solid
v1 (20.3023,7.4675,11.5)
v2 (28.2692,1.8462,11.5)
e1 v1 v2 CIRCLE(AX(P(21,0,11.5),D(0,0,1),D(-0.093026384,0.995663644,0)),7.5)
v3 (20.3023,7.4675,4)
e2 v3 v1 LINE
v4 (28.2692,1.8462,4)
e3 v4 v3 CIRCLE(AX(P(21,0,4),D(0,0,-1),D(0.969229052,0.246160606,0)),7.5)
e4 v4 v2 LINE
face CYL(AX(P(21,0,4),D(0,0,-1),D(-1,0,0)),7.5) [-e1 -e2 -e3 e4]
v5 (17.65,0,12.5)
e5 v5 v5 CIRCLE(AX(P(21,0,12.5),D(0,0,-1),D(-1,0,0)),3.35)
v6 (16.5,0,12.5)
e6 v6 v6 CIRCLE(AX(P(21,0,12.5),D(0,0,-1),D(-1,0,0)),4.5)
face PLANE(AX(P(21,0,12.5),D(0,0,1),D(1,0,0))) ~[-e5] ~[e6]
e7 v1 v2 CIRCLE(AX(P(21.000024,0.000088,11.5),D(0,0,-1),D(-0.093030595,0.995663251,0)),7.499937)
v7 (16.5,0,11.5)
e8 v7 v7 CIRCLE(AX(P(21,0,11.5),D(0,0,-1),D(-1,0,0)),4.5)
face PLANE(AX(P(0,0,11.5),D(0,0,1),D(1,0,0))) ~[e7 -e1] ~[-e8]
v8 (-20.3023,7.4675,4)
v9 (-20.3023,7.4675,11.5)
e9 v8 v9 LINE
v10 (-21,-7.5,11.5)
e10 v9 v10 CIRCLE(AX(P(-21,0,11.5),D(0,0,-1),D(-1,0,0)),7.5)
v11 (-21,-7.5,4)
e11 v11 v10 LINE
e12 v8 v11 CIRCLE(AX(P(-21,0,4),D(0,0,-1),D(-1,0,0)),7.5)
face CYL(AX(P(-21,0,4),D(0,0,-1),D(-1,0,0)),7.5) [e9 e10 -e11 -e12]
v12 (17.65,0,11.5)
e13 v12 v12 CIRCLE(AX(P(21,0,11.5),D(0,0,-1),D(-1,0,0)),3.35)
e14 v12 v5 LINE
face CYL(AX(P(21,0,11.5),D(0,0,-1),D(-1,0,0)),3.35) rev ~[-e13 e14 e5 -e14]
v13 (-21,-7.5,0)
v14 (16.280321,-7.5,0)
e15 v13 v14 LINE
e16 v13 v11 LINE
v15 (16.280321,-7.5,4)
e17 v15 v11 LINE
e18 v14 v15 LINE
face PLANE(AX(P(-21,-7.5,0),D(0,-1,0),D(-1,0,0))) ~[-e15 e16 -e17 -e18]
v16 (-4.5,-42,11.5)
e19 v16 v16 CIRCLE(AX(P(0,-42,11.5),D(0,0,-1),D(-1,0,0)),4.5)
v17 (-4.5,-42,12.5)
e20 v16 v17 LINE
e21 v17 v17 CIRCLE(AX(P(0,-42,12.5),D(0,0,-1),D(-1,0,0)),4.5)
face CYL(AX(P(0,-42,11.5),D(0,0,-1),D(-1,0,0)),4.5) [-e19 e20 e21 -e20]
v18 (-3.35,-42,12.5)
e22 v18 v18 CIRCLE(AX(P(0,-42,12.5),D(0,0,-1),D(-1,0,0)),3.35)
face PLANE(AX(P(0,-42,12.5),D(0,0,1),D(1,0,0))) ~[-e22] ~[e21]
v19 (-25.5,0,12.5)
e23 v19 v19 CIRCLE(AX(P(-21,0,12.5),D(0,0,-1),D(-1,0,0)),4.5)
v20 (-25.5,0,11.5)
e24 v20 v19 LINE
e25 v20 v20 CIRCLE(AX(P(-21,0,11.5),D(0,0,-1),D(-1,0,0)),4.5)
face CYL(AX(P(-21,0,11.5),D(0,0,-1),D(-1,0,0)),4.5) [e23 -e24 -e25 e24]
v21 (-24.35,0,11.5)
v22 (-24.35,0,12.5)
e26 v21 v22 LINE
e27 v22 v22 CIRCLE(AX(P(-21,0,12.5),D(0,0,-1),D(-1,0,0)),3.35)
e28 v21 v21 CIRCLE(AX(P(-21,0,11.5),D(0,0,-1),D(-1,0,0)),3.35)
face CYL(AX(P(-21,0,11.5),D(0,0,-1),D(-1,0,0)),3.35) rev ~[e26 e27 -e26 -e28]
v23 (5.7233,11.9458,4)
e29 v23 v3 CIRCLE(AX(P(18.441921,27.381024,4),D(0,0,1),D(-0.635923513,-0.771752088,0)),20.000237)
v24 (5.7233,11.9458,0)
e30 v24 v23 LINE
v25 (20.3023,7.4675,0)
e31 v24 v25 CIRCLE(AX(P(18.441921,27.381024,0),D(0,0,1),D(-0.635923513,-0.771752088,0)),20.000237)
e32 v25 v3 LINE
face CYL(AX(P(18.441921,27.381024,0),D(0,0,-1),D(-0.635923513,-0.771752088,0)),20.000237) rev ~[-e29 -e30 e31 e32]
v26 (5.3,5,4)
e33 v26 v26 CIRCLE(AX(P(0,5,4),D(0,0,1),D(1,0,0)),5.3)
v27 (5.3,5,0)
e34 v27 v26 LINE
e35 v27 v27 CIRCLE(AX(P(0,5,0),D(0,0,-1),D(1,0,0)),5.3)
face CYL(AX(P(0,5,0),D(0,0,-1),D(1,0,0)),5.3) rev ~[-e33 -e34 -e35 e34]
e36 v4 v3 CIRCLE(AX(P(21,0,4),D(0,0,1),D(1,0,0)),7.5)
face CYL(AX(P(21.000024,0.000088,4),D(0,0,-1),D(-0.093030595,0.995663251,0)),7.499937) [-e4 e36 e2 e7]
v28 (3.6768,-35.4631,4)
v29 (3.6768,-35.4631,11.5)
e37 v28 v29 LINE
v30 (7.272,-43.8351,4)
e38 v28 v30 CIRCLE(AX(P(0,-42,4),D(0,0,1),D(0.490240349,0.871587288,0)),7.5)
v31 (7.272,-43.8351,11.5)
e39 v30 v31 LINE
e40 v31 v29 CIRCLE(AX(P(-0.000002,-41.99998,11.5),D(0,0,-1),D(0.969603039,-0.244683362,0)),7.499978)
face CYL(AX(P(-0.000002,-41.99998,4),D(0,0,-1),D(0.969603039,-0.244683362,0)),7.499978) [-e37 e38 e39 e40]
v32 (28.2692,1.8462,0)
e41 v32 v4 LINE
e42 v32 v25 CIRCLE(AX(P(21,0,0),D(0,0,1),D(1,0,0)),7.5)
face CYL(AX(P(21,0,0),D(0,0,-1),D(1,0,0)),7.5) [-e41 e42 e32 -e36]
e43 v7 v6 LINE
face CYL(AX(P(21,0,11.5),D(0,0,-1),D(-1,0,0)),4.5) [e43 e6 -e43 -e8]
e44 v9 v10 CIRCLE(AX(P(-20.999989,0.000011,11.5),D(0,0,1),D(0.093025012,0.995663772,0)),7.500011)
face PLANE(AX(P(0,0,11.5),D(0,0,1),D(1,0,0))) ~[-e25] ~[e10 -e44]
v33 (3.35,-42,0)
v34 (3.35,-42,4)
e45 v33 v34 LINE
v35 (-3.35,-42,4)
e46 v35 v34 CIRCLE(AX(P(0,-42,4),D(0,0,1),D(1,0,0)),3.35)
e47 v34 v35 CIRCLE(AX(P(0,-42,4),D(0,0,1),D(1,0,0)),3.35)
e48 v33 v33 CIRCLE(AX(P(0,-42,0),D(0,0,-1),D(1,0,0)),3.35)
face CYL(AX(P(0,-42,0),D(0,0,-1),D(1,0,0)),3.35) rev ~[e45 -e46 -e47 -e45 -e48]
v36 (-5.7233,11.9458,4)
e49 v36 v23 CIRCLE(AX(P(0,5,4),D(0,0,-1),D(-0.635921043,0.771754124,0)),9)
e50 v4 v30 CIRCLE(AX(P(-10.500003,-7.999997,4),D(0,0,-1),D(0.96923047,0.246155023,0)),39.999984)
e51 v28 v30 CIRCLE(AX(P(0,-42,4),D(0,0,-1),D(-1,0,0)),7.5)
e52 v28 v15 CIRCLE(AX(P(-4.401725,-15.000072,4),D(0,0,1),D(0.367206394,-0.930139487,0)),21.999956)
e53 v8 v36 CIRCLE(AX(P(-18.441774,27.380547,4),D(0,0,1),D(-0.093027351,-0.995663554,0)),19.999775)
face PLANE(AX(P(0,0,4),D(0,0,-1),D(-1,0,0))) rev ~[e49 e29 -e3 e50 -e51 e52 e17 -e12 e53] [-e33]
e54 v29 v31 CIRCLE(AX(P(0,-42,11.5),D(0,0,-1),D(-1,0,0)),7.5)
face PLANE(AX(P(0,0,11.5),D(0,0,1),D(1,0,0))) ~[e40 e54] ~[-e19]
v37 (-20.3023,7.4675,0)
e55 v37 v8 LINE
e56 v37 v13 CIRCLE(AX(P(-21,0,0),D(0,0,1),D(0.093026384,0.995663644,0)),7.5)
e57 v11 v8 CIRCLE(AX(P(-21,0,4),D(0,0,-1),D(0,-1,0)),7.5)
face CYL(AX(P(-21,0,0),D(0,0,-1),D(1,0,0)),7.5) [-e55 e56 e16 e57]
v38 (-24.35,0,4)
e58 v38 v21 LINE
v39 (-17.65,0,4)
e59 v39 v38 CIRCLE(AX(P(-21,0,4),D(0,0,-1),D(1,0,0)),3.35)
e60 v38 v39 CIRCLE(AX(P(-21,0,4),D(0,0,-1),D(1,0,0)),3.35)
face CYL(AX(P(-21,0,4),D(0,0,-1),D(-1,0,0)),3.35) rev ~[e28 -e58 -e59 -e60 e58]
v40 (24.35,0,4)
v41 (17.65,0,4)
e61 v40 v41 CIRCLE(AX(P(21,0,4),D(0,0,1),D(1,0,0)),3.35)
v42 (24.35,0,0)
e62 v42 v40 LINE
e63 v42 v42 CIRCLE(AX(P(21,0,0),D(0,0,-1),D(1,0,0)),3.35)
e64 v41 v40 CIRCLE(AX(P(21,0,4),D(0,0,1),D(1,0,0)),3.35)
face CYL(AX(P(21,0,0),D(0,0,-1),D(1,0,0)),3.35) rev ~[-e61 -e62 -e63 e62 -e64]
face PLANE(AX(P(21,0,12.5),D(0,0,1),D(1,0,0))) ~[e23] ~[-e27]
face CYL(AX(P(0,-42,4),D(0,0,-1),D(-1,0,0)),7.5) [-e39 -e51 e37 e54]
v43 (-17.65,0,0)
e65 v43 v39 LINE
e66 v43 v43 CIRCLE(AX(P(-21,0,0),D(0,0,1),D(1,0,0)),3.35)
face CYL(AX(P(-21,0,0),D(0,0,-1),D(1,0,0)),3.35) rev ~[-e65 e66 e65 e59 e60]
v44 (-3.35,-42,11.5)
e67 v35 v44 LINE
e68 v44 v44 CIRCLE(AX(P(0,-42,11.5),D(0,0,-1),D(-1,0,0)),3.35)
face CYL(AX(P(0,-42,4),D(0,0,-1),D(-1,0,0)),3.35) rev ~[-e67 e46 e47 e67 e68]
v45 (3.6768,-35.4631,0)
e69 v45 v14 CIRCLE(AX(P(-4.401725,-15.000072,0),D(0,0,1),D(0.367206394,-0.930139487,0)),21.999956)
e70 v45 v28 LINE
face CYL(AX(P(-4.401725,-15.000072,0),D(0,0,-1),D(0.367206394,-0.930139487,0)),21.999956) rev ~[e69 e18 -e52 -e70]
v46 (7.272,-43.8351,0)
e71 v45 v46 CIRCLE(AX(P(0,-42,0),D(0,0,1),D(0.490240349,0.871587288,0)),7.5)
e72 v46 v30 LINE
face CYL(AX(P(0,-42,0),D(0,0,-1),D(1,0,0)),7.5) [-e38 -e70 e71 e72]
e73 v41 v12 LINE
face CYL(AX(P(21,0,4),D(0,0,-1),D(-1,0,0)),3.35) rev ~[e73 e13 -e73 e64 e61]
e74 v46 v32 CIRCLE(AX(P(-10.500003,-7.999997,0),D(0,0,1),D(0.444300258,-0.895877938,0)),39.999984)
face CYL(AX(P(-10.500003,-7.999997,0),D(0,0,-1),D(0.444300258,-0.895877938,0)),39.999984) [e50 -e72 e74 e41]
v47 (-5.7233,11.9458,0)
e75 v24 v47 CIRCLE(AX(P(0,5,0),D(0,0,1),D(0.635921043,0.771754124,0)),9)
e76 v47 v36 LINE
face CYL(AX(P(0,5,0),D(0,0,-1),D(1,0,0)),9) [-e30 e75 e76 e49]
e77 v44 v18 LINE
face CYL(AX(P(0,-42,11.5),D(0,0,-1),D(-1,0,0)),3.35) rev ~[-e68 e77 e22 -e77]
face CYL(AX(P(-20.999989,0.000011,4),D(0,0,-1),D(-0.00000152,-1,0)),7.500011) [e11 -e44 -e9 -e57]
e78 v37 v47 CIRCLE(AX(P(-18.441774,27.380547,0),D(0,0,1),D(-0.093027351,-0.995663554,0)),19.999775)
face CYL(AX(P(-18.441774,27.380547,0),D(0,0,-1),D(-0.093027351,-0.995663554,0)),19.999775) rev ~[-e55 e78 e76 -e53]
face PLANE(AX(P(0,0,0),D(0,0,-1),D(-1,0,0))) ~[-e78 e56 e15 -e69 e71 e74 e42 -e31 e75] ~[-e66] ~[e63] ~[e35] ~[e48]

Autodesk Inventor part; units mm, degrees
ref_plane "YZ Plane" through (0, 0, 0) normal (1, 0, 0) x (0, 1, 0)
ref_plane "XZ Plane" through (0, 0, 0) normal (0, 1, 0) x (-1, 0, 0)
ref_plane "XY Plane" through (0, 0, 0) normal (0, 0, 1) x (1, 0, 0)
sketch "Skizze1" plane through (0, 0, 0) normal (0, 0, 1) x (1, 0, 0)
  line L0 (-50.1686, 0) -> (50.7617, 0) projected
  line L1 (0, -73.5762) -> (0, 44.2069) projected
  circle A0 centre (-21, 0) radius 3.35
  circle A1 centre (-21, 0) radius 14.75 construction
  circle A2 centre (21, 0) radius 3.35
  circle A3 centre (21, 0) radius 14.75 construction
  circle A4 centre (0, -42) radius 3.35
  circle A5 centre (0, -42) radius 14.75 construction
  circle A6 centre (0, 5) radius 5.3
  circle A7 centre (0, 5) radius 9
  circle A8 centre (-21, 0) radius 7.5
  circle A9 centre (21, 0) radius 7.5
  arc A10 (-20.3023, 7.4675) -> (-5.7233, 11.9458) centre (-18.4418, 27.3808) ccw
  arc A11 (5.7233, 11.9458) -> (20.3023, 7.4675) centre (18.4418, 27.3808) ccw
  line L2 (-21, -7.5) -> (21, -7.5)
  circle A12 centre (0, -42) radius 7.5
  arc A13 (3.6768, -35.4631) -> (14.5419, -3.8136) centre (-4.4018, -15) ccw
  arc A14 (7.272, -43.8351) -> (28.2692, 1.8462) centre (-10.5, -8) ccw
  point P0 (0, 0)
  point P1 (28.1068, -2.3967)
  point P2 (19.4082, -7.3291)
  point P3 (-19.4082, -7.3291)
  point P4 (13.6211, 1.3423)
  point P5 (2.9103, -48.9123)
  point P6 (28.4986, 0.1465)
  point P7 (-0.3947, -34.5104)
  point P8 (13.9951, -2.6799)
  dimension "d16" = 15
  dimension "d0" = 6.7
  dimension "d3" = 29.5
  dimension "d4" = 21
  dimension "d5" = 6.7
  dimension "d6" = 42
  dimension "d7" = 29.5
  dimension "d12" = 10.6
  dimension "d13" = 18
  dimension "d14" = 5
  dimension "d15" = 15
  dimension "d19" = 20
  dimension "d20" = 20
  dimension "d47" = 15
  dimension "d51" = 22
  dimension "d52" = 40
  dimension "d53" = 27
  dimension "d54" = 34
extrude "Extrusion1" add sketch "Skizze1" against normal blind 4 contours A0 L0 A8 | L0 A8 A0 | A8 A10 A7 L0 | L0 A7 L1 L2 A8 | A7 L1 A6 L0 | L0 A6 L1 A7 | A7 L0 A9 A13 L2 L1 | L1 A6 L0 A7 | L1 A7 L0 A6 | A7 A11 A9 L0 | A12 L1 A4 | L1 A4 A12 | A13 A9 L2 | L2 A9 L0 A14 A12 A13 | A9 L0 A2 | L0 A2 A9 | A9 A14 L0
sketch "Skizze4" plane through (0, 0, -4) normal (0, 0, -1) x (-1, 0, 0)
  circle A0 centre (-21, 0) radius 3.35 projected
  circle A1 centre (0, 5) radius 5.3 projected
  circle A2 centre (21, 0) radius 3.35 projected
  line L0 (-16.2803, -7.5) -> (21, -7.5) projected
  arc A3 (21, -7.5) -> (20.3023, 7.4675) centre (21, 0) ccw projected
  arc A4 (5.7233, 11.9458) -> (20.3023, 7.4675) centre (18.4418, 27.3808) ccw projected
  arc A5 (5.7233, 11.9458) -> (-5.7233, 11.9458) centre (0, 5) ccw projected
  arc A6 (-20.3023, 7.4675) -> (-5.7233, 11.9458) centre (-18.4418, 27.3808) ccw projected
  arc A7 (-20.3023, 7.4675) -> (-28.2692, 1.8462) centre (-21, 0) ccw projected
  circle A8 centre (-21, 0) radius 7.5
  circle A9 centre (21, 0) radius 7.5
  arc A10 (-7.272, -43.8351) -> (-3.6768, -35.4631) centre (0, -42) ccw projected
  arc A11 (-28.2692, 1.8462) -> (-7.272, -43.8351) centre (10.5, -8) ccw projected
  arc A12 (-16.2803, -7.5) -> (-3.6768, -35.4631) centre (4.4018, -15) ccw projected
  point P0 (0, 0)
  dimension "d34" = 15
  dimension "d35" = 15
extrude "Extrusion4" add sketch "Skizze4" along normal blind 7.5 contours A9 A3 | A7 A8
sketch "Skizze5" plane through (21, 0, -11.5) normal (0, 0, -1) x (-1, 0, 0)
  circle A0 centre (0, 0) radius 3.35 projected
  circle A1 centre (0, 0) radius 7.5 projected
  circle A2 centre (42, 0) radius 3.35 projected
  circle A3 centre (42, 0) radius 7.5 projected
  circle A4 centre (0, 0) radius 4.5
  circle A5 centre (42, 0) radius 3.4 projected
  circle A6 centre (42, 0) radius 4.5
  point P0 (21, 0)
  dimension "d38" = 9
  dimension "d39" = 9
extrude "Extrusion5" add sketch "Skizze5" along normal blind 1 contours A4 | A5 | A6
sketch "Skizze8" plane through (0, 0, -4) normal (0, 0, -1) x (-1, 0, 0)
  circle A0 centre (0, -42) radius 3.35 projected
  circle A1 centre (0, 5) radius 5.3 projected
  arc A2 (-28.2692, 1.8462) -> (-20.3023, 7.4675) centre (-21, 0) ccw projected
  arc A3 (-28.2692, 1.8462) -> (-7.272, -43.8351) centre (10.5, -8) ccw projected
  arc A4 (-7.272, -43.8351) -> (-3.6768, -35.4631) centre (0, -42) ccw projected
  arc A5 (-16.2803, -7.5) -> (-3.6768, -35.4631) centre (4.4018, -15) ccw projected
  line L0 (-16.2803, -7.5) -> (21, -7.5) projected
  arc A6 (20.3023, 7.4675) -> (21, -7.5) centre (21, 0) ccw projected
  arc A7 (5.7233, 11.9458) -> (20.3023, 7.4675) centre (18.4418, 27.3808) ccw projected
  arc A8 (5.7233, 11.9458) -> (-5.7233, 11.9458) centre (0, 5) ccw projected
  arc A9 (-20.3023, 7.4675) -> (-5.7233, 11.9458) centre (-18.4418, 27.3808) ccw projected
  circle A10 centre (0, -42) radius 7.5
  point P0 (0, 0)
  dimension "d55" = 15
extrude "Extrusion7" add sketch "Skizze8" along normal blind 7.5 contours A10 A4
sketch "Skizze9" plane through (0, -42, -11.5) normal (0, 0, -1) x (-1, 0, 0)
  circle A0 centre (0, 0) radius 3.35 projected
  circle A1 centre (0, 0) radius 7.5 projected
  circle A2 centre (0, 0) radius 4.5
  point P0 (0, 42)
  dimension "d58" = 9
extrude "Extrusion8" add sketch "Skizze9" along normal blind 1 contours A2
mirror "Spiegeln1" about plane through (0, 0, 0) normal (0, 0, 1) of "Extrusion1", "Extrusion4", "Extrusion5", "Extrusion7", "Extrusion8"
sketch "Skizze19" plane through (0, 0, 0) normal (0, 0, 1) x (1, 0, 0)
  line L0 (-37.3748, -55.7465) -> (60.3793, -55.7465)
  line L1 (60.3793, -55.7465) -> (60.3793, 24.5119)
  line L2 (60.3793, 24.5119) -> (-37.3748, 24.5119)
  line L3 (-37.3748, 24.5119) -> (-37.3748, -55.7465)
  point P0 (0, 0)
extrude "Extrusion17" cut sketch "Skizze19" against normal blind 13
equation "\"d5\" = d0"
equation "\"d7\" = d3"
equation "\"d20\" = d19"
properties part number "Linearwagen_MauroW_inside"
